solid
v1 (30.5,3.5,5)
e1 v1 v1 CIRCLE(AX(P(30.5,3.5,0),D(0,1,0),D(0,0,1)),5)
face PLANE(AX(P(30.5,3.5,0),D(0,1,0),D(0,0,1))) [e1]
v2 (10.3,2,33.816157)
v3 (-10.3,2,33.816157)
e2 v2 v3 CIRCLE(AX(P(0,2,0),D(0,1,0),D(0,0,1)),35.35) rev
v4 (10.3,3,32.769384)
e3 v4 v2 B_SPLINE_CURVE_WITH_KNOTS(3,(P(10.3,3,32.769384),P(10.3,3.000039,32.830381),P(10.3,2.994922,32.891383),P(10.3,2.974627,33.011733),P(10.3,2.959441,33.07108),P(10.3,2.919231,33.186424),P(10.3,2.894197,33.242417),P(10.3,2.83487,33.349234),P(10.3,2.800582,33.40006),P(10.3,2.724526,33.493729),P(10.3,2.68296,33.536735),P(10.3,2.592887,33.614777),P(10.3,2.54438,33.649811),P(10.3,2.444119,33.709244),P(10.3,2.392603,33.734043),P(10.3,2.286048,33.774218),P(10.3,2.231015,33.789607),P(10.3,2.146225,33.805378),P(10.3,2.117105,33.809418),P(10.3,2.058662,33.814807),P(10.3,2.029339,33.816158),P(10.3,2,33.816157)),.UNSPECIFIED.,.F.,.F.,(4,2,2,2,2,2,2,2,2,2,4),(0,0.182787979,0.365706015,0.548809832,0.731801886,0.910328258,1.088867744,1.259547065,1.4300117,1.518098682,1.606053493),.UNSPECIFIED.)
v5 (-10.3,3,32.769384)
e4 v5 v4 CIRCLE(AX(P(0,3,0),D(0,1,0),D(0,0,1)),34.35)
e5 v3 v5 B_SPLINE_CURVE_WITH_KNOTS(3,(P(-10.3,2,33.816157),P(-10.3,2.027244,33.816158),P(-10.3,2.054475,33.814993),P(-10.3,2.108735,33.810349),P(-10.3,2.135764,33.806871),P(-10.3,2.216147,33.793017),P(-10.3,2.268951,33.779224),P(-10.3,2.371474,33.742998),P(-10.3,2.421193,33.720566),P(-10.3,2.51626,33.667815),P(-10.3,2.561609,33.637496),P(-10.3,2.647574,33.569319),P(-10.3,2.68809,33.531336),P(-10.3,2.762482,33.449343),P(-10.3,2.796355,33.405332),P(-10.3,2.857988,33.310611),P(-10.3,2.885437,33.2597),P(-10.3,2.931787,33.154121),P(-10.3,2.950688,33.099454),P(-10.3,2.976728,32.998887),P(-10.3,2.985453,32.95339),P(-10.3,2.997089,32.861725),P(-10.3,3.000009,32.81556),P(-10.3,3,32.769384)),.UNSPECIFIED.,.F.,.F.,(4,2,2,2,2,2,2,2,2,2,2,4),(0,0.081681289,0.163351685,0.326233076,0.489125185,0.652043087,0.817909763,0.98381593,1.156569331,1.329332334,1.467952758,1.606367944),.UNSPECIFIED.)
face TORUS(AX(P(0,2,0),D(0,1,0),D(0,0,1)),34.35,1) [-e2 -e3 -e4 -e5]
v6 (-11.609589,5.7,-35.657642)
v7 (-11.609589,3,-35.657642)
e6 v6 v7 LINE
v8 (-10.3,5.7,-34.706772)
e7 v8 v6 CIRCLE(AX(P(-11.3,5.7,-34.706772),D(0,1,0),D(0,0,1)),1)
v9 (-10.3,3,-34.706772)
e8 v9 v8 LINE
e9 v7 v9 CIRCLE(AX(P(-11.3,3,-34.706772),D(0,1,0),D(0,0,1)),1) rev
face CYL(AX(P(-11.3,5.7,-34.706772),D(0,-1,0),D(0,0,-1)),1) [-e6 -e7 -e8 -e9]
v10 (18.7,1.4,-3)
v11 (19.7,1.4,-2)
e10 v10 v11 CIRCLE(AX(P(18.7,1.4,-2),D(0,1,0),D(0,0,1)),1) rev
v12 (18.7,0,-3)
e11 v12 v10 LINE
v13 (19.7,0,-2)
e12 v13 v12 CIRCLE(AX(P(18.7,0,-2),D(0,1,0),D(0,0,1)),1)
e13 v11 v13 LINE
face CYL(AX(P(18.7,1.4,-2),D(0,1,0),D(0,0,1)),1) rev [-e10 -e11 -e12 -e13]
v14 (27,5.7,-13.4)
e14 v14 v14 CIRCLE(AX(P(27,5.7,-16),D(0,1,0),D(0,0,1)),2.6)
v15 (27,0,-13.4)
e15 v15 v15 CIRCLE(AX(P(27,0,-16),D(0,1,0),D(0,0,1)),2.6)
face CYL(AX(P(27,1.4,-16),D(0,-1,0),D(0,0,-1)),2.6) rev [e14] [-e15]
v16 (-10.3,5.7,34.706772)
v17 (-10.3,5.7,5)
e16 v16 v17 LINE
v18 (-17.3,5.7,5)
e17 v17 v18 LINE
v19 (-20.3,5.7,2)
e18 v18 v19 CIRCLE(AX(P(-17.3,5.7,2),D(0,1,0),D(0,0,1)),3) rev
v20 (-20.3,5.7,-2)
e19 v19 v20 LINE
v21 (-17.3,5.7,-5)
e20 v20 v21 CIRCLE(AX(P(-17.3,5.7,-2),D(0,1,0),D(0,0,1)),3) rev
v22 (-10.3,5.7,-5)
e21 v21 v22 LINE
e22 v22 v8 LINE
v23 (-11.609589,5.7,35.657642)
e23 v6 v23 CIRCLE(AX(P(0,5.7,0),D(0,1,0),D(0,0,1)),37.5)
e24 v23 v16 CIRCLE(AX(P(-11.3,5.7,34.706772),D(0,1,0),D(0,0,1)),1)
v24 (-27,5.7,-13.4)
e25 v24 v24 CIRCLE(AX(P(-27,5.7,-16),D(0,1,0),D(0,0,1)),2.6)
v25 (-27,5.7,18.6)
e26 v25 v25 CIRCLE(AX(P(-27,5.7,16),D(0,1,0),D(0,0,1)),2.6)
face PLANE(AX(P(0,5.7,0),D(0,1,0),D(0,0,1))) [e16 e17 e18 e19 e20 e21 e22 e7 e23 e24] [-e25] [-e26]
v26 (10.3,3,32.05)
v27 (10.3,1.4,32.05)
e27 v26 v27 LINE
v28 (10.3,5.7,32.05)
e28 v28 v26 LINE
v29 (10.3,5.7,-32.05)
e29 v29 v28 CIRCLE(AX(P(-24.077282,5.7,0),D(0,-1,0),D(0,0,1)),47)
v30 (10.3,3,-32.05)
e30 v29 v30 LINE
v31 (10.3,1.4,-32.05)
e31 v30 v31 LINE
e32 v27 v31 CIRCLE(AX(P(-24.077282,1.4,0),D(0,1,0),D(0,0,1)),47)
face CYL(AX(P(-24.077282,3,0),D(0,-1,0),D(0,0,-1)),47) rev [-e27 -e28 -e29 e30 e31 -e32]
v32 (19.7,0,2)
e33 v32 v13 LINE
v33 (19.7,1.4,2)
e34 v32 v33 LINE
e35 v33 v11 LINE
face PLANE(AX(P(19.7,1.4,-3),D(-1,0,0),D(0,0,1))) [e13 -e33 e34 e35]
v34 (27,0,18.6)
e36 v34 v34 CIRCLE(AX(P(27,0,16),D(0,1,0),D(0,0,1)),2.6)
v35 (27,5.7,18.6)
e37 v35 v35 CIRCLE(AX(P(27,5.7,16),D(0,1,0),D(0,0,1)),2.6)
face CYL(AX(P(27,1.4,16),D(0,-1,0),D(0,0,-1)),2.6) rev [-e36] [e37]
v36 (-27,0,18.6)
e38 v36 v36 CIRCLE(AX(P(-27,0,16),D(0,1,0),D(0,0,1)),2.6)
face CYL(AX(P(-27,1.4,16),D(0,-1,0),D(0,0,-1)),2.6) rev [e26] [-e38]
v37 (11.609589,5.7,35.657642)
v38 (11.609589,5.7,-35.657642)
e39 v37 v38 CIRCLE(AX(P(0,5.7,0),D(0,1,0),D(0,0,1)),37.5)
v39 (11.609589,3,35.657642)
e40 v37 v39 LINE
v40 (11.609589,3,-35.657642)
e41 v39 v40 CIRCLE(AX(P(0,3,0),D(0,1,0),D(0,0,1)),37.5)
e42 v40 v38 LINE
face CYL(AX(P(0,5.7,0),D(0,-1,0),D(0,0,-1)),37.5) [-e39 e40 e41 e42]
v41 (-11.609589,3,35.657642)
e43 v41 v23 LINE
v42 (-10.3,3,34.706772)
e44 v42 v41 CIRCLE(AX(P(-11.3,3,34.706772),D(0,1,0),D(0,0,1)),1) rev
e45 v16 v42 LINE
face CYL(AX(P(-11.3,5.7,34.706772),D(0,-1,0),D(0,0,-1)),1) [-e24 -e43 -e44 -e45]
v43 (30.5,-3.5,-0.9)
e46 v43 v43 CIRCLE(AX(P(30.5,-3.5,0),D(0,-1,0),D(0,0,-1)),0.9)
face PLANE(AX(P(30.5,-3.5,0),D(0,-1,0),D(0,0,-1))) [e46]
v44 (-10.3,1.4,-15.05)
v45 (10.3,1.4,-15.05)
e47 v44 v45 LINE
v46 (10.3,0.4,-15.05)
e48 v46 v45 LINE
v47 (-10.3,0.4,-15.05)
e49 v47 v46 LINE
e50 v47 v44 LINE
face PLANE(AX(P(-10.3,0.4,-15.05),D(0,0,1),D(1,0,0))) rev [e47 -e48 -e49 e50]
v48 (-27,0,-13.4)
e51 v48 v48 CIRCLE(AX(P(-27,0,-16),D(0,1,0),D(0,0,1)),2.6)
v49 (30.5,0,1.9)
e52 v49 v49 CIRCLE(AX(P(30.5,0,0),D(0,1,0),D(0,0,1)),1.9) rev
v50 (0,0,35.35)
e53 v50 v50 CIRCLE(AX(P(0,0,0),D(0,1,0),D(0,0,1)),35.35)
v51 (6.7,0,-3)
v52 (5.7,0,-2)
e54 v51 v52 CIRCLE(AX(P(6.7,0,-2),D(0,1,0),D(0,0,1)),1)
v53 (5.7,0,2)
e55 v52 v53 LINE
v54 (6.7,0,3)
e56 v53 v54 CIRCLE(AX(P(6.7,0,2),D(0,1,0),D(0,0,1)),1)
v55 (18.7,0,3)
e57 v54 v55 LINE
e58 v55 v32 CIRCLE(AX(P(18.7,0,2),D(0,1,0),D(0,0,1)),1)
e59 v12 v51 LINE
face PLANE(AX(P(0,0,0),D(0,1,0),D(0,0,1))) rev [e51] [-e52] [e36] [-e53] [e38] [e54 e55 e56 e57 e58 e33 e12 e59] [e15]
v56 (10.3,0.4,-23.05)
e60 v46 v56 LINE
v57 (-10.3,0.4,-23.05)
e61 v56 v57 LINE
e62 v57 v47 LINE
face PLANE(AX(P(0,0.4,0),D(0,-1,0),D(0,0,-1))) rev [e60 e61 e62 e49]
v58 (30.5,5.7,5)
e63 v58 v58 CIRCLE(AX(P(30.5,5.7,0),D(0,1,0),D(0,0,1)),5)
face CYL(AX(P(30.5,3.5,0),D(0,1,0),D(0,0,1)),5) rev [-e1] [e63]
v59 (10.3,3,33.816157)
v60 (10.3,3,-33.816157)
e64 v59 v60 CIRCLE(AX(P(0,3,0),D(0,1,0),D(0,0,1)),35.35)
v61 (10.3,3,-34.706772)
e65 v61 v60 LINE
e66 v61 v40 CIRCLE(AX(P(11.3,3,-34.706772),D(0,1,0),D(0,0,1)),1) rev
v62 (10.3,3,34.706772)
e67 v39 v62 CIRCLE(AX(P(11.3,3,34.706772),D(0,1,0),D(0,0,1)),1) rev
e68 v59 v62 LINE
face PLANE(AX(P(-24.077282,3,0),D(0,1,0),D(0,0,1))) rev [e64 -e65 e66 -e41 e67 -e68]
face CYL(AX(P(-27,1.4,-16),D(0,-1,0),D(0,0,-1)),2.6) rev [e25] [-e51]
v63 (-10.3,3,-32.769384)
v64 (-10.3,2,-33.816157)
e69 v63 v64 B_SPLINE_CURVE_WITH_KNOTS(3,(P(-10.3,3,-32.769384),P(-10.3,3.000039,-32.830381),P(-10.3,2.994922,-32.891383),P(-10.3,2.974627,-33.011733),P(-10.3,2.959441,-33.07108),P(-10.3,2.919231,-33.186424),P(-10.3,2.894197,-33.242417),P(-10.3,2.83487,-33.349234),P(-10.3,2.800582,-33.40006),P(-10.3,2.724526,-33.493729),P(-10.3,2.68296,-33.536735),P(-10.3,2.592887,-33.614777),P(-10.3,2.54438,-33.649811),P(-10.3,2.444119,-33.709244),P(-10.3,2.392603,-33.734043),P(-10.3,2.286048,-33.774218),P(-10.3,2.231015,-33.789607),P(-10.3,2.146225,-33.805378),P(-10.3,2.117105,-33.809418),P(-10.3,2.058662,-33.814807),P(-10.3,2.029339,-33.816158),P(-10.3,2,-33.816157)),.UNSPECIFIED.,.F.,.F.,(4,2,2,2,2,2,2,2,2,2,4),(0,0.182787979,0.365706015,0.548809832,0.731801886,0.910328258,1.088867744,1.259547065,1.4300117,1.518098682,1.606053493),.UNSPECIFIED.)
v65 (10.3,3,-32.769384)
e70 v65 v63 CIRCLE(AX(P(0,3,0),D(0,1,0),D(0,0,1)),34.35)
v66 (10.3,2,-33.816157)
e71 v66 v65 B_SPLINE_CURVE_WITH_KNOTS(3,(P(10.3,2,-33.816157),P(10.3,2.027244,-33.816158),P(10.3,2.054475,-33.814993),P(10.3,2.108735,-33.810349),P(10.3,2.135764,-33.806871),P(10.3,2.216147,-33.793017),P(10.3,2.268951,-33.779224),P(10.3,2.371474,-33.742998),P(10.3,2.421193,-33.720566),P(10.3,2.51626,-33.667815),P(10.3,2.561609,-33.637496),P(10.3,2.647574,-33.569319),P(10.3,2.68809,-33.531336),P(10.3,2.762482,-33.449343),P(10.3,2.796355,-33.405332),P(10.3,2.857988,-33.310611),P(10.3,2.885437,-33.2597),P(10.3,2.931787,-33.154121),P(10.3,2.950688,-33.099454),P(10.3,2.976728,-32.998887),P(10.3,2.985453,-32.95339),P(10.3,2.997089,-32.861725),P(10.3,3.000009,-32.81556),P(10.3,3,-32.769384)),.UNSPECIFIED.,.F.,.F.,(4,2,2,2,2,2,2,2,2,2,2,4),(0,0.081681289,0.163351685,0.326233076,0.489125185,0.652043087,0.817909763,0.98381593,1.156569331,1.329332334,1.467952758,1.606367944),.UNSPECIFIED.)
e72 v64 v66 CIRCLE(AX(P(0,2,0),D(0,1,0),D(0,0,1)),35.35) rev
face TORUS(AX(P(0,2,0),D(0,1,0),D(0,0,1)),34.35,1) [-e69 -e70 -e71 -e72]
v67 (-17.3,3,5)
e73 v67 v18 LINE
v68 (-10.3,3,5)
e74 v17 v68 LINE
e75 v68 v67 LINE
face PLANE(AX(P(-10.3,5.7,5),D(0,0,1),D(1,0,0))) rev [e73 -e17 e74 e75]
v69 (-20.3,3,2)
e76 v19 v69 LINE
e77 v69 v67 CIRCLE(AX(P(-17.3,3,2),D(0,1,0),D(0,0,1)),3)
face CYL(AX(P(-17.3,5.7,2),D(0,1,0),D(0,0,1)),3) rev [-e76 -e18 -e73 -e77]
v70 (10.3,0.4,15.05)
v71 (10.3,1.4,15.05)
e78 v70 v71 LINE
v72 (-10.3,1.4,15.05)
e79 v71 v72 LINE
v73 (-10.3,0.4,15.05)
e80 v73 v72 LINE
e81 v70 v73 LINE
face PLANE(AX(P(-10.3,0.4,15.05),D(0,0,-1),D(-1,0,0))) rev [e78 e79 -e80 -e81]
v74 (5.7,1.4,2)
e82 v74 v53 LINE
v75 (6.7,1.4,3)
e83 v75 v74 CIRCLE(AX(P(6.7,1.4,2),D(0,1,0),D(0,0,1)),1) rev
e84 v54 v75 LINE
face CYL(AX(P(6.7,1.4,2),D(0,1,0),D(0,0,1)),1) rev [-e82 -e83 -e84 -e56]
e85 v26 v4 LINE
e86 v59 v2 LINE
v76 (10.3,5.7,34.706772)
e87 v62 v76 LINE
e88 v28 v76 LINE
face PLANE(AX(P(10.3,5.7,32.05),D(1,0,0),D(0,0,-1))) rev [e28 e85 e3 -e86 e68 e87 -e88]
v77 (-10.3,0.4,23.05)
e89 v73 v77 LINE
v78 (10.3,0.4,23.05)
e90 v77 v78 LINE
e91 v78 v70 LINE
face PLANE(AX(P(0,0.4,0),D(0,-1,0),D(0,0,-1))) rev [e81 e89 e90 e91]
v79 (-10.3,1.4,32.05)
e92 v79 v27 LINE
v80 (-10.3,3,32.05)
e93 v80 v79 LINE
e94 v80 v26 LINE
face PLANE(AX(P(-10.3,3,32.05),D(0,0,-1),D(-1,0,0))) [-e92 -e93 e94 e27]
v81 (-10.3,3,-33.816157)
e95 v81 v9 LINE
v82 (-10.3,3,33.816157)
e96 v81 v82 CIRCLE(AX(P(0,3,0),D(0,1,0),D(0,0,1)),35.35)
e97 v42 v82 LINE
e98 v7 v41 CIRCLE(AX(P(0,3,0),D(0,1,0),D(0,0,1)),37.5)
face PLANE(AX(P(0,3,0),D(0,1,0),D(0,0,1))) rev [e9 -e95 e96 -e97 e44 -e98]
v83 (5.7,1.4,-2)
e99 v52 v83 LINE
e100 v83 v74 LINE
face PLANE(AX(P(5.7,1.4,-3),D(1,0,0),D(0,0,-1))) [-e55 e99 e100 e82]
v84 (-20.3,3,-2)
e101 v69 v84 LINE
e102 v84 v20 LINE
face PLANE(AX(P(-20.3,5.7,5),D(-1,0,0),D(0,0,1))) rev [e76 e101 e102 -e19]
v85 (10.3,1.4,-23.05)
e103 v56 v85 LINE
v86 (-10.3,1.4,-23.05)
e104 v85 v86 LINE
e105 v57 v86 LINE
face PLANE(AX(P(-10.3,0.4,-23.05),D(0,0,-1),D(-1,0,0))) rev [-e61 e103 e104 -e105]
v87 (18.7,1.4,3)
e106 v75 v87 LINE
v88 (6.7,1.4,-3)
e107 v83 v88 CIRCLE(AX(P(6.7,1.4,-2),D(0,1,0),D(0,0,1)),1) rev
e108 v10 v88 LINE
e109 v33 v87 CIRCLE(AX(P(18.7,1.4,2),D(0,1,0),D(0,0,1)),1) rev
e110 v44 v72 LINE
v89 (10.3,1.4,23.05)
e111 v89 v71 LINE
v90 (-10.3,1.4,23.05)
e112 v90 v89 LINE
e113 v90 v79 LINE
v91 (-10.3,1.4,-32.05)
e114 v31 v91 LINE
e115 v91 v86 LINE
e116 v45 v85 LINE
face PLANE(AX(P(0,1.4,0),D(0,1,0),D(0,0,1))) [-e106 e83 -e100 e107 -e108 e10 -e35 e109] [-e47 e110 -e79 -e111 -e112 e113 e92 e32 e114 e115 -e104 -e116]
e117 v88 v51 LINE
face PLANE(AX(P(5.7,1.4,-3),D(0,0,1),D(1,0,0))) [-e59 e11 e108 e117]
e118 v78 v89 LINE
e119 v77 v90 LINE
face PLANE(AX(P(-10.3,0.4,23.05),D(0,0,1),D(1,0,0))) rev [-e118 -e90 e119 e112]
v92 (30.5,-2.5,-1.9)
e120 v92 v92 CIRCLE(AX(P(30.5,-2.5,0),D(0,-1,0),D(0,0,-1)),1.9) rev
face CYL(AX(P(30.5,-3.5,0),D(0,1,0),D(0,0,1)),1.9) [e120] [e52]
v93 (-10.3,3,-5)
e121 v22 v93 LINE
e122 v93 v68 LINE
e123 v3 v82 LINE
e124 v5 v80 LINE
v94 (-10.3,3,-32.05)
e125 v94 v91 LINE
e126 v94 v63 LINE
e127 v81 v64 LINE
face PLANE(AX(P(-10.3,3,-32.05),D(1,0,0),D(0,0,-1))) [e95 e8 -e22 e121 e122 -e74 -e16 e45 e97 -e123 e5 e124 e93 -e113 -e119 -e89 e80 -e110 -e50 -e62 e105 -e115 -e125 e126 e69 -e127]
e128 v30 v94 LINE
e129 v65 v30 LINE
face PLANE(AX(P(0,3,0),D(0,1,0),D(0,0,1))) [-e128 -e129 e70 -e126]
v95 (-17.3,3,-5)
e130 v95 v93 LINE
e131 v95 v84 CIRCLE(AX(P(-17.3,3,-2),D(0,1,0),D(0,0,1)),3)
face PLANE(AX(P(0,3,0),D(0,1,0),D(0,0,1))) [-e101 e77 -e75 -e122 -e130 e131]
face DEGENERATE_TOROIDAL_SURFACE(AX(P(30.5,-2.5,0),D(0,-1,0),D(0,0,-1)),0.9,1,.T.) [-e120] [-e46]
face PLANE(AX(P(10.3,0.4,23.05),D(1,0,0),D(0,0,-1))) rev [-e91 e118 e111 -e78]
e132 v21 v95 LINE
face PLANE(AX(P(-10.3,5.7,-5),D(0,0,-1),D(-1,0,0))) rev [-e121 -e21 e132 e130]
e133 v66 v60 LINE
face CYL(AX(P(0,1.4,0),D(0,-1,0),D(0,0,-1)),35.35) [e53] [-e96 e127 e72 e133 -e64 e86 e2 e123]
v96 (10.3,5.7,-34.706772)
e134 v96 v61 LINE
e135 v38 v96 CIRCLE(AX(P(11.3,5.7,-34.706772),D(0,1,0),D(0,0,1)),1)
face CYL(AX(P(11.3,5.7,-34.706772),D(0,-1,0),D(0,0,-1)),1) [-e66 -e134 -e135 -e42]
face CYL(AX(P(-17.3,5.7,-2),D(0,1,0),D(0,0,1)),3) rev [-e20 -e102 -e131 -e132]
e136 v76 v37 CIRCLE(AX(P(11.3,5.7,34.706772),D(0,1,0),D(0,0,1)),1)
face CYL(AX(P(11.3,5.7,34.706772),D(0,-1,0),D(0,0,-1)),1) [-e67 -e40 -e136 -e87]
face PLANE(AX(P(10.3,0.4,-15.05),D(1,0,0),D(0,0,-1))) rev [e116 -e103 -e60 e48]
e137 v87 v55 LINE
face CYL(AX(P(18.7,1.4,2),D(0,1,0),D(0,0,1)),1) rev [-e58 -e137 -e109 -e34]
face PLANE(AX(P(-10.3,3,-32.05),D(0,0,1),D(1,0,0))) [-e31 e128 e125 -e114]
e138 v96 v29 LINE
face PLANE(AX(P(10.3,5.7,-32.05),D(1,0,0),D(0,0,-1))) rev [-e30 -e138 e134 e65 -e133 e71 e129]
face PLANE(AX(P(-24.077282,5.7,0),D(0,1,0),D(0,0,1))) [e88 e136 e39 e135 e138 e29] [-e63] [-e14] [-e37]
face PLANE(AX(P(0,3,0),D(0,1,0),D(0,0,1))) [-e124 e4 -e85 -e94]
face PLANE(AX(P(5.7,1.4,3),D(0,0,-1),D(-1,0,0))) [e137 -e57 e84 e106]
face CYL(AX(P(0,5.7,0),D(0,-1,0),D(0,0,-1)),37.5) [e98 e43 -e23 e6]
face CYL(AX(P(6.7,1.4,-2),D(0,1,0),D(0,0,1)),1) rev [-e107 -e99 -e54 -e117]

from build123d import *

# Parameters (mm, degrees)
SKETCH1_R           = 35.35
SKETCH1_R_2         = 2.6
SKETCH1_W           = 14
SKETCH1_H           = 6
BOSS_EXTRUDE1_DEPTH = 1.4
FILLET1_R           = 1
SKETCH3_R           = 35.35
SKETCH3_R_2         = 2.6
BOSS_EXTRUDE3_DEPTH = 1.6
SKETCH4_R           = 2.6
BOSS_EXTRUDE4_DEPTH = 2.7
SKETCH5_R           = 5
CUT_EXTRUDE1_DEPTH  = 2.2
SKETCH7_W           = 20.6
SKETCH7_H           = 8
CUT_EXTRUDE3_DEPTH  = 1
SKETCH8_R           = 1.9
BOSS_EXTRUDE6_DEPTH = 3.5
FILLET2_R           = 1
FILLET3_R           = 3


with BuildPart() as part:
    # Sketch1 → Boss-Extrude1 (new body)
    with BuildSketch(Plane(origin=(0, 0, 0), x_dir=(1, 0, 0), z_dir=(0, 1, 0))):
        with Locations(Location((0, 0, 0), (0, 0, 270))):
            Circle(SKETCH1_R)
        with Locations(Location((27, 16, 0), (0, 0, 270))):
            Circle(SKETCH1_R_2, mode=Mode.SUBTRACT)
        with Locations(Location((-27, 16, 0), (0, 0, 270))):
            Circle(SKETCH1_R_2, mode=Mode.SUBTRACT)
        with Locations(Location((-27, -16, 0), (0, 0, 270))):
            Circle(SKETCH1_R_2, mode=Mode.SUBTRACT)
        with Locations(Location((27, -16, 0), (0, 0, 270))):
            Circle(SKETCH1_R_2, mode=Mode.SUBTRACT)
        with Locations((12.7, 0)):
            Rectangle(SKETCH1_W, SKETCH1_H, mode=Mode.SUBTRACT)
    extrude(amount=BOSS_EXTRUDE1_DEPTH)

    # Fillet1
    fillet1_edges = [part.edges().sort_by_distance(p)[0] for p in [
        (5.7, 0.7, -3),
        (5.7, 0.7, 3),
        (19.7, 0.7, 3),
        (19.7, 0.7, -3),
    ]]
    fillet(fillet1_edges, radius=FILLET1_R)

    # Sketch3 → Boss-Extrude3 (add)
    with BuildSketch(Plane(origin=(0, 1.4, 0), x_dir=(1, 0, 0), z_dir=(0, 1, 0))):
        with Locations(Location((0, 0, 0), (0, 0, 270))):
            Circle(SKETCH3_R)
        with Locations(Location((27, 16, 0), (0, 0, 270))):
            Circle(SKETCH3_R_2, mode=Mode.SUBTRACT)
        with Locations(Location((27, -16, 0), (0, 0, 270))):
            Circle(SKETCH3_R_2, mode=Mode.SUBTRACT)
        with Locations(Location((-27, -16, 0), (0, 0, 270))):
            Circle(SKETCH3_R_2, mode=Mode.SUBTRACT)
        with Locations(Location((-27, 16, 0), (0, 0, 270))):
            Circle(SKETCH3_R_2, mode=Mode.SUBTRACT)
        with BuildLine():
            Line((-10.3, 32.05), (10.3, 32.05))
            ThreePointArc((10.3, 32.05), (22.922718258, 0), (10.3, -32.05))
            Line((10.3, -32.05), (-10.3, -32.05))
            Line((-10.3, -32.05), (-10.3, 32.05))
        make_face(mode=Mode.SUBTRACT)
    extrude(amount=BOSS_EXTRUDE3_DEPTH)

    # Sketch4 → Boss-Extrude4 (add)
    # profile 1 of 2: a face of its own
    with BuildSketch(Plane(origin=(0, 3, 0), x_dir=(1, 0, 0), z_dir=(0, 1, 0))):
        with BuildLine():
            Line((-10.3, 36.057731487), (-10.3, 5))
            Line((-10.3, 5), (-20.3, 5))
            Line((-20.3, 5), (-20.3, -5))
            Line((-20.3, -5), (-10.3, -5))
            Line((-10.3, -5), (-10.3, -36.057731487))
            ThreePointArc((-10.3, -36.057731487), (-37.5, 0), (-10.3, 36.057731487))
        make_face()
        with Locations(Location((-27, 16, 0), (0, 0, 270))):
            Circle(SKETCH4_R, mode=Mode.SUBTRACT)
        with Locations(Location((-27, -16, 0), (0, 0, 270))):
            Circle(SKETCH4_R, mode=Mode.SUBTRACT)
    # profile 2 of 2: a face of its own
    with BuildSketch(Plane(origin=(0, 3, 0), x_dir=(1, 0, 0), z_dir=(0, 1, 0))):
        with BuildLine():
            Line((10.3, 32.05), (10.3, 36.057731487))
            ThreePointArc((10.3, 36.057731487), (37.5, 0), (10.3, -36.057731487))
            Line((10.3, -36.057731487), (10.3, -32.05))
            ThreePointArc((10.3, -32.05), (22.922718258, 0), (10.3, 32.05))
        make_face()
        with Locations(Location((27, -16, 0), (0, 0, 270))):
            Circle(SKETCH4_R, mode=Mode.SUBTRACT)
        with Locations(Location((27, 16, 0), (0, 0, 270))):
            Circle(SKETCH4_R, mode=Mode.SUBTRACT)
    extrude(amount=BOSS_EXTRUDE4_DEPTH)

    # Sketch5 → Cut-Extrude1 (cut)
    with BuildSketch(Plane(origin=(0, 5.7, 0), x_dir=(1, 0, 0), z_dir=(0, 1, 0))):
        with Locations(Location((30.5, 0, 0), (0, 0, 270))):
            Circle(SKETCH5_R)
    extrude(amount=-CUT_EXTRUDE1_DEPTH, mode=Mode.SUBTRACT)

    # Sketch7 → Cut-Extrude3 (cut)
    with BuildSketch(Plane(origin=(0, 1.4, 0), x_dir=(1, 0, 0), z_dir=(0, 1, 0))):
        with Locations((0, -19.05)):
            Rectangle(SKETCH7_W, SKETCH7_H)
        with Locations((0, 19.05)):
            Rectangle(SKETCH7_W, SKETCH7_H)
    extrude(amount=-CUT_EXTRUDE3_DEPTH, mode=Mode.SUBTRACT)

    # Sketch8 → Boss-Extrude6 (add)
    with BuildSketch(Plane.XZ):
        with Locations(Location((30.5, 0, 0), (0, 0, 90))):
            Circle(SKETCH8_R)
    extrude(amount=BOSS_EXTRUDE6_DEPTH)

    # Fillet2
    # the kernel refuses this fillet: 1 mm, written as the material it takes off along each edge
    with BuildSketch(Plane(origin=(0, 3, 0), x_dir=(0, 0, 1), z_dir=(-1, 0, 0))) as fillet2_piece_1_section:
        with BuildLine():
            CenterArc((35.35 - FILLET2_R, -FILLET2_R), FILLET2_R, 0, 90)
            Line((35.35 - FILLET2_R, 0), (35.35, 0))
            Line((35.35, 0), (35.35, -FILLET2_R))
        make_face()
    fillet2_piece_1 = revolve(axis=Axis((0, 3, 0), (0, 1, 0)), revolution_arc=20.992206164, mode=Mode.PRIVATE)
    fillet2_piece_1 = split(fillet2_piece_1, bisect_by=Plane(origin=(10.3, 2.776649723, 34.610378642), z_dir=(-1, 0, 0)), keep=Keep.TOP, mode=Mode.PRIVATE)
    add(fillet2_piece_1, mode=Mode.SUBTRACT)
    with BuildSketch(Plane(origin=(-10.3, -0.42335266, -36.057731487), x_dir=(0, 0, 1), z_dir=(0, 1, 0)), Plane(origin=(10.3, -0.42335266, 36.057731487), x_dir=(0, 0, -1), z_dir=(0, 1, 0))) as fillet2_piece_2:
        with BuildLine():
            CenterArc((1.350959814, -1), FILLET2_R, 90, 108.034465952)
            ThreePointArc((0.400089357, -1.309589041), (0.1940666, -0.656620869), (0, 0))
            Line((0, 0), (1.350959814, 0))
        make_face()
    extrude(amount=9.546705321, mode=Mode.SUBTRACT)
    with BuildSketch(Plane(origin=(-10.3, -0.42335266, 36.057731487), x_dir=(0, 0, -1), z_dir=(0, 1, 0)), Plane(origin=(10.3, -0.42335266, -36.057731487), x_dir=(0, 0, 1), z_dir=(0, 1, 0))) as fillet2_piece_3:
        with BuildLine():
            CenterArc((1.350959814, 1), FILLET2_R, 161.965534048, 108.034465952)
            ThreePointArc((0.400089357, 1.309589041), (0.1940666, 0.656620869), (0, 0))
            Line((0, 0), (1.350959814, 0))
        make_face()
    extrude(amount=9.546705321, mode=Mode.SUBTRACT)
    with BuildSketch(Plane(origin=(30.5, -3.5, 0), x_dir=(0, 0, 1), z_dir=(1, 0, 0))) as fillet2_piece_4:
        with BuildLine():
            CenterArc((1.9 - FILLET2_R, -FILLET2_R), FILLET2_R, 0, 90)
            Line((1.9 - FILLET2_R, 0), (1.9, 0))
            Line((1.9, 0), (1.9, -FILLET2_R))
        make_face()
    revolve(axis=Axis((30.5, -3.5, 0), (0, -1, 0)), mode=Mode.SUBTRACT)
    with BuildSketch(Plane(origin=(0, 3, 0), x_dir=(0.3582437714618883, 0, -0.9336280845222912), z_dir=(0.9336280845222912, 0, 0.3582437714618883))) as fillet2_piece_5_section:
        with BuildLine():
            CenterArc((35.35 - FILLET2_R, -FILLET2_R), FILLET2_R, 0, 90)
            Line((35.35 - FILLET2_R, 0), (35.35, 0))
            Line((35.35, 0), (35.35, -FILLET2_R))
        make_face()
    fillet2_piece_5 = revolve(axis=Axis((0, 3, 0), (0, 1, 0)), revolution_arc=41.984758253, mode=Mode.PRIVATE)
    fillet2_piece_5 = split(fillet2_piece_5, bisect_by=Plane(origin=(-10.3, 2.718769388, -35.068769388), z_dir=(1, 0, 0)), keep=Keep.TOP, mode=Mode.PRIVATE)
    fillet2_piece_5 = split(fillet2_piece_5, bisect_by=Plane(origin=(10.3, 2.718769388, -35.068769388), z_dir=(-1, 0, 0)), keep=Keep.TOP, mode=Mode.PRIVATE)
    add(fillet2_piece_5, mode=Mode.SUBTRACT)
    with BuildSketch(Plane(origin=(0, 3, 0), x_dir=(-0.35824095305440445, 0, 0.9336291659725889), z_dir=(-0.9336291659725889, 0, -0.35824095305440445))) as fillet2_piece_6_section:
        with BuildLine():
            CenterArc((35.35 - FILLET2_R, -FILLET2_R), FILLET2_R, 0, 90)
            Line((35.35 - FILLET2_R, 0), (35.35, 0))
            Line((35.35, 0), (35.35, -FILLET2_R))
        make_face()
    fillet2_piece_6 = revolve(axis=Axis((0, 3, 0), (0, 1, 0)), revolution_arc=20.992206164, mode=Mode.PRIVATE)
    fillet2_piece_6 = split(fillet2_piece_6, bisect_by=Plane(origin=(-10.3, 2.776650175, 34.610378573), z_dir=(1, 0, 0)), keep=Keep.TOP, mode=Mode.PRIVATE)
    add(fillet2_piece_6, mode=Mode.SUBTRACT)

    # Fillet3
    fillet3_edges = [part.edges().sort_by_distance(p)[0] for p in [
        (-20.3, 4.35, 5),
        (-20.3, 4.35, -5),
    ]]
    fillet(fillet3_edges, radius=FILLET3_R)


solid = part.part
